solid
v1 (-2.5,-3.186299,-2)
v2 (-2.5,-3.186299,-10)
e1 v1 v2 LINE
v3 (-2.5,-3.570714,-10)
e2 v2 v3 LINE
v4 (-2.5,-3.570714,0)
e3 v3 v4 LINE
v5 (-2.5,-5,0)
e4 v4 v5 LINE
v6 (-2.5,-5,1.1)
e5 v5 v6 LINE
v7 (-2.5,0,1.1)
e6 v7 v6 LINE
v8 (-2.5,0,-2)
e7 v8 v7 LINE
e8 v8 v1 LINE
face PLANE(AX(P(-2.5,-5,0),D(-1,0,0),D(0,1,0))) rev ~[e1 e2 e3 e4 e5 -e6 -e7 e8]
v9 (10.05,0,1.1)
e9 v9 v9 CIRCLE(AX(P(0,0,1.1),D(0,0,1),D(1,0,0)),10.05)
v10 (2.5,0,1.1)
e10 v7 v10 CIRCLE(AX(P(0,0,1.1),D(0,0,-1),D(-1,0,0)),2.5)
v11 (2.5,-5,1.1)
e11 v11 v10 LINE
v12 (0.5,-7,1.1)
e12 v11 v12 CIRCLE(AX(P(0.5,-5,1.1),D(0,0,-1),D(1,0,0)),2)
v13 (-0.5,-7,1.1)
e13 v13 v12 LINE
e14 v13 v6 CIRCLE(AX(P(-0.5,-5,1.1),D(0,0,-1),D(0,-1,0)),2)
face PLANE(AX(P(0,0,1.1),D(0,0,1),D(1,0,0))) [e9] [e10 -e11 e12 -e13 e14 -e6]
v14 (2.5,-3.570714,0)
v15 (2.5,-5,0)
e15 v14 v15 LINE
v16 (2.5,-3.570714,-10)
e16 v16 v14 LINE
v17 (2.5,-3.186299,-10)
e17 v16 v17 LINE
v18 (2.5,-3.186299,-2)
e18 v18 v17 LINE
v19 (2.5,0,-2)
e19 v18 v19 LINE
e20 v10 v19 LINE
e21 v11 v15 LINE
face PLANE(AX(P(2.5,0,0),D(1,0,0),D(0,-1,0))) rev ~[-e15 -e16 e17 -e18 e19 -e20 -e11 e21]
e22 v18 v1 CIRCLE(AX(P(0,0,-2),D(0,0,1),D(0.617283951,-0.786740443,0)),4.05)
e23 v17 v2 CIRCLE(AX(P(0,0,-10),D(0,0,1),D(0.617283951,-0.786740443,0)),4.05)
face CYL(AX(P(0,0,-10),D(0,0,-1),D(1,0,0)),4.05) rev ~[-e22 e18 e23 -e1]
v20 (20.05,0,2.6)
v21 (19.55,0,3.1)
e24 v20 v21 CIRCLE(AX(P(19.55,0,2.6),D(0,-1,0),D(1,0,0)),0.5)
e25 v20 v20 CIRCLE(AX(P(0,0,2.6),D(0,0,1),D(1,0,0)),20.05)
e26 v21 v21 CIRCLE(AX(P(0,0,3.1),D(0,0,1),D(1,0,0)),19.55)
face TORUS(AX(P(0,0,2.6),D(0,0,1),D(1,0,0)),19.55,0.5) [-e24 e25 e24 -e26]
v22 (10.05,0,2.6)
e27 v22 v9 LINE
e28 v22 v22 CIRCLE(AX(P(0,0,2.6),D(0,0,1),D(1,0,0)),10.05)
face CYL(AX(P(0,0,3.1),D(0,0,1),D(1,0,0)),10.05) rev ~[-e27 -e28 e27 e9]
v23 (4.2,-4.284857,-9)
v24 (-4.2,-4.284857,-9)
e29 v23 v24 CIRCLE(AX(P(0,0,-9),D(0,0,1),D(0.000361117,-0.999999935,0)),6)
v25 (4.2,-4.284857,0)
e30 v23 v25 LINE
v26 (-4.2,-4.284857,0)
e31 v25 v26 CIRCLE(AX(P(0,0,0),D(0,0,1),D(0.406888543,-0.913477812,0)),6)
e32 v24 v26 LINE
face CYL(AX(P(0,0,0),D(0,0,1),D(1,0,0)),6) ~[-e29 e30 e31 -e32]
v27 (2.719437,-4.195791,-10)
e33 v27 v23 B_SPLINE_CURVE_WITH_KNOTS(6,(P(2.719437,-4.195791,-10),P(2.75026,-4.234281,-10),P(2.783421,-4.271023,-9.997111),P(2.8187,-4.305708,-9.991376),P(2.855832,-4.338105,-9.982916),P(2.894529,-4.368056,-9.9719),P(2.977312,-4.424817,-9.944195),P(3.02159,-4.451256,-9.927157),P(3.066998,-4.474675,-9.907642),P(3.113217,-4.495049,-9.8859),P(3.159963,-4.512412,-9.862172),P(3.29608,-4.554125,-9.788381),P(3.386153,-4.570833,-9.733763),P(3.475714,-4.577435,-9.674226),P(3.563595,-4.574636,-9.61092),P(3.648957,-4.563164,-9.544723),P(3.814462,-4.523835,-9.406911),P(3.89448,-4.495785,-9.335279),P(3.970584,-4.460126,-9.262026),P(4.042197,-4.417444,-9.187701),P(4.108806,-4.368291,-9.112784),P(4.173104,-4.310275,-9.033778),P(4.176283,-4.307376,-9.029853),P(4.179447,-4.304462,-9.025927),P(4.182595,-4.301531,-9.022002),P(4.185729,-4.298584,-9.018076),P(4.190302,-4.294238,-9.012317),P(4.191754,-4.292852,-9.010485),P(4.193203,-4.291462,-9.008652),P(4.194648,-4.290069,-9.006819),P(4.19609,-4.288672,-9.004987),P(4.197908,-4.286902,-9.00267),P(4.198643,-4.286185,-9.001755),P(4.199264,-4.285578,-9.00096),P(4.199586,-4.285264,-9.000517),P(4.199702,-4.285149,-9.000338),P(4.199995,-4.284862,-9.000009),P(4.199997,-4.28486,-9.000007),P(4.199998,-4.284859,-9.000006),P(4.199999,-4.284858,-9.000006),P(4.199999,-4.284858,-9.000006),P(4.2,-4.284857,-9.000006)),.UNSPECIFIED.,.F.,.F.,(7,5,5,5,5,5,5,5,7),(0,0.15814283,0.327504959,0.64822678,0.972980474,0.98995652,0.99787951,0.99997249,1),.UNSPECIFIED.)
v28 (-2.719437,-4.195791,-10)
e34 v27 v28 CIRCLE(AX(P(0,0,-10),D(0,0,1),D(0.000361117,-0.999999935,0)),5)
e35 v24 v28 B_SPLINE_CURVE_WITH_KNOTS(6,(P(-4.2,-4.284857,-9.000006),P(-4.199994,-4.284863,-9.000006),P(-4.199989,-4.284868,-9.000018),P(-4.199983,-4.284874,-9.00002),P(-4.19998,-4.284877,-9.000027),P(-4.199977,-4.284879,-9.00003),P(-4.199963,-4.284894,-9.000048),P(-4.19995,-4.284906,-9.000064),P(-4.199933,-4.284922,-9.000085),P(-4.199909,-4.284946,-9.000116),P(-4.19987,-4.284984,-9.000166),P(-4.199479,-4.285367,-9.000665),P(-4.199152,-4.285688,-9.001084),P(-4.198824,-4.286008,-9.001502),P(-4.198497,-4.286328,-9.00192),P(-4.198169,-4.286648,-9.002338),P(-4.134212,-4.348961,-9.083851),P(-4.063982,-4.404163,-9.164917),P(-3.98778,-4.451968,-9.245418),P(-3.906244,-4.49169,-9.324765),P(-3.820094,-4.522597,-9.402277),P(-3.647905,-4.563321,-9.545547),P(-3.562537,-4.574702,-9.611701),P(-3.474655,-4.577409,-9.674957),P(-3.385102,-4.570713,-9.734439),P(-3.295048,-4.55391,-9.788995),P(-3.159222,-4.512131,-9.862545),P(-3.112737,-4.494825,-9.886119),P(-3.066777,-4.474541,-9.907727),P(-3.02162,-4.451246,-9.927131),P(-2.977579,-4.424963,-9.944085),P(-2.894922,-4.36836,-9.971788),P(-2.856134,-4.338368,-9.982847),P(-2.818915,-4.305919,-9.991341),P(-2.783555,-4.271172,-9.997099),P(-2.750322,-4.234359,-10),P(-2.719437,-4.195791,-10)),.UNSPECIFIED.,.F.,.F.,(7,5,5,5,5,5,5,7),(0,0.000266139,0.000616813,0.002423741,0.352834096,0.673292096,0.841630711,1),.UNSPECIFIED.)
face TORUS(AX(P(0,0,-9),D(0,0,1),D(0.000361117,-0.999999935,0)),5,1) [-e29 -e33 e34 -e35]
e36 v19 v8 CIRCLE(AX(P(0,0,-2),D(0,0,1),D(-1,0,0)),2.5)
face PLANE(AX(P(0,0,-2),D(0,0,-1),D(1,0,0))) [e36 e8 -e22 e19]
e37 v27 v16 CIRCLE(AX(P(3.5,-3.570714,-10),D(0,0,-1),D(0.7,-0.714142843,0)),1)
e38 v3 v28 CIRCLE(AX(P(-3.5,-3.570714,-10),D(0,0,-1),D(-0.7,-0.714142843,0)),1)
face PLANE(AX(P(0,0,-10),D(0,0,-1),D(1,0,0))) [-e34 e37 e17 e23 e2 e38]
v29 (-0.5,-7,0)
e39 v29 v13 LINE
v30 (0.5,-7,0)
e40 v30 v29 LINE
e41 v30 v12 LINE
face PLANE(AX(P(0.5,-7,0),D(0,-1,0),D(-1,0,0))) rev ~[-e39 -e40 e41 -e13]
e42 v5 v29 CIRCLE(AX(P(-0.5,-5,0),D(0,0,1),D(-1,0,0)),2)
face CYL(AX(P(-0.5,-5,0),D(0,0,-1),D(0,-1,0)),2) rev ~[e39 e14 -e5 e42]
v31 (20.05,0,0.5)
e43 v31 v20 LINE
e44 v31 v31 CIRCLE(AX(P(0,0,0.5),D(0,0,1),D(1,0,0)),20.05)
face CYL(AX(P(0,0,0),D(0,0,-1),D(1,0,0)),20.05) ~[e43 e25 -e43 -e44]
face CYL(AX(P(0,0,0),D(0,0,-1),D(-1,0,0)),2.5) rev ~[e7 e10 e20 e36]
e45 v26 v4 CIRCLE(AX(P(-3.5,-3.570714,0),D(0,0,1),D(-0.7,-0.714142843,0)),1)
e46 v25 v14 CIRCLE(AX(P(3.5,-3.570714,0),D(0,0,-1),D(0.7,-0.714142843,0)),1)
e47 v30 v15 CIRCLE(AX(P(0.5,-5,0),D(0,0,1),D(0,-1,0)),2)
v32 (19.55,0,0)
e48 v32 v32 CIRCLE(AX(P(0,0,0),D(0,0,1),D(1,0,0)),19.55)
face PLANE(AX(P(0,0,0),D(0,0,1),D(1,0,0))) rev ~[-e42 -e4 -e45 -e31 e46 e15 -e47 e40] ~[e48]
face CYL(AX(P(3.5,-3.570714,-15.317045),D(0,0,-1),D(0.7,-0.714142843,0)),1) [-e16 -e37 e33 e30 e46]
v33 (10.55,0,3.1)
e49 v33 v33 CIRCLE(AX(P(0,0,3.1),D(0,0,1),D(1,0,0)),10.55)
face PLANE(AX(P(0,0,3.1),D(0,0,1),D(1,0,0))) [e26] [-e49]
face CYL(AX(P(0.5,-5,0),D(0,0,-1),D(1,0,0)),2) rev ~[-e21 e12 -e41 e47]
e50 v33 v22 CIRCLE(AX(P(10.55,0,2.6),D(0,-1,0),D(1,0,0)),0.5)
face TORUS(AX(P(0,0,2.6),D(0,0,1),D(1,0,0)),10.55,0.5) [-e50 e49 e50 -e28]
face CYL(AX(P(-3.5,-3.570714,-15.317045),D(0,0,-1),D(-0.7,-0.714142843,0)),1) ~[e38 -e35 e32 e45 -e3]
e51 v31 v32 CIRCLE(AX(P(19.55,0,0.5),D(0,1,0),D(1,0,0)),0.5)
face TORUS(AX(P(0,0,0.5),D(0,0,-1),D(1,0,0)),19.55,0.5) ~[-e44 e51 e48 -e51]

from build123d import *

# Parameters (mm, degrees)
F0_R           = 20.05
F1_DEPTH       = 3.1
F2_R           = 10.05
F3_DEPTH       = 2
F4_R           = 0.5
F6_R           = 6
F7_DEPTH       = 10
F8_R           = 4.05
F9_DEPTH       = 8
F10_DEPTH      = 10.001
F10_DEPTH_BACK = 3.1010001
F11_T1_DEPTH   = 15.3170452501
F11_T4_ANGLE   = 359.9586190749


# Not quite as in the source:
# - a fillet or chamfer that OpenCascade refuses, or shapes differently, is made with other operations: its cross-section is extruded or revolved along the edge and cut away or added


with BuildPart() as f1:
    # F0 (on Top) → F1 (new body)
    with BuildSketch(Plane.XY):
        Circle(F0_R)
    extrude(amount=F1_DEPTH)

    # F2 (on face) → F3 (cut)
    with BuildSketch(Plane.XY.offset(3.1)):
        Circle(F2_R)
    extrude(amount=-F3_DEPTH, mode=Mode.SUBTRACT)

    # F4
    f4_edges = [f1.edges().sort_by_distance(p)[0] for p in [
        (-20.05, 0, 3.1),
        (-10.05, 0, 3.1),
        (-20.05, 0, 0),
    ]]
    fillet(f4_edges, radius=F4_R)

    # F6 (on face) → F7 (join)
    with BuildSketch(Plane(origin=(0, 0, 0), x_dir=(1, 0, 0), z_dir=(0, 0, -1))):
        Circle(F6_R)
    extrude(amount=F7_DEPTH)

    # F8 (on face) → F9 (cut)
    with BuildSketch(Plane(origin=(0, 0, -10), x_dir=(1, 0, 0), z_dir=(0, 0, -1))):
        Circle(F8_R)
    extrude(amount=-F9_DEPTH, mode=Mode.SUBTRACT)

    # F5 (on face) → F10 (cut, two sides)
    with BuildSketch(Plane(origin=(0, 0, 0), x_dir=(1, 0, 0), z_dir=(0, 0, -1))) as f10_sk:
        with BuildLine():
            Line((-2.5, 5), (-2.5, 0))
            ThreePointArc((-2.5, 0), (0, -2.5), (2.5, 0))
            Line((2.5, 0), (2.5, 5))
            ThreePointArc((2.5, 5), (1.9142135624, 6.4142135624), (0.5, 7))
            Line((0.5, 7), (-0.5, 7))
            ThreePointArc((-0.5, 7), (-1.9142135624, 6.4142135624), (-2.5, 5))
        make_face()
    extrude(amount=F10_DEPTH, mode=Mode.SUBTRACT)
    extrude(f10_sk.sketch, amount=-F10_DEPTH_BACK, mode=Mode.SUBTRACT)

    # F11: fillet of radius 1 on 3 edges, made by hand

    # F11_s2 → F11_t1 (cut)
    with BuildSketch(Plane.XY.offset(-15.3170452501)):
        with BuildLine():
            ThreePointArc((-4.2, -4.2848570571), (-3.1127016654, -4.49266866), (-2.5, -3.5707142143))
            Line((-2.5, -3.5707142143), (-2.4, -3.5707142143))
            ThreePointArc((-2.4, -3.5707142143), (-2.4, -5), (-2.3442646941, -5.4568235306))
            Line((-2.3442646941, -5.4568235306), (-2.4820201112, -5.5722146555))
            ThreePointArc((-2.4820201112, -5.5722146555), (-3.4303168121, -5.0440981918), (-4.27, -4.3562713414))
            Line((-4.27, -4.3562713414), (-4.2, -4.2848570571))
        make_face()
        with BuildLine():
            ThreePointArc((4.2, -4.2848570571), (3.1127016654, -4.49266866), (2.5, -3.5707142143))
            Line((2.5, -3.5707142143), (2.4, -3.5707142143))
            ThreePointArc((2.4, -3.5707142143), (2.4, -5), (2.3442646941, -5.4568235306))
            Line((2.3442646941, -5.4568235306), (2.4820201112, -5.5722146555))
            ThreePointArc((2.4820201112, -5.5722146555), (3.4303168121, -5.0440981918), (4.27, -4.3562713414))
            Line((4.27, -4.3562713414), (4.2, -4.2848570571))
        make_face()
    extrude(amount=F11_T1_DEPTH, mode=Mode.SUBTRACT)

    # F11_s3 → F11_t4 (revolve, cut)
    with BuildSketch(Plane(origin=(0, 0, 0), x_dir=(0, 0, 1), z_dir=(-0.9999999348, -0.0003611167, 0))):
        with BuildLine():
            ThreePointArc((-10, -5), (-9.7071067812, -5.7071067812), (-9, -6))
            Line((-9, -6), (-10, -6))
            Line((-10, -6), (-10, -5))
        make_face()
    revolve(axis=Axis((0, 0, -10), (0, 0, 1)), revolution_arc=F11_T4_ANGLE, mode=Mode.SUBTRACT)


solid = f1.part
